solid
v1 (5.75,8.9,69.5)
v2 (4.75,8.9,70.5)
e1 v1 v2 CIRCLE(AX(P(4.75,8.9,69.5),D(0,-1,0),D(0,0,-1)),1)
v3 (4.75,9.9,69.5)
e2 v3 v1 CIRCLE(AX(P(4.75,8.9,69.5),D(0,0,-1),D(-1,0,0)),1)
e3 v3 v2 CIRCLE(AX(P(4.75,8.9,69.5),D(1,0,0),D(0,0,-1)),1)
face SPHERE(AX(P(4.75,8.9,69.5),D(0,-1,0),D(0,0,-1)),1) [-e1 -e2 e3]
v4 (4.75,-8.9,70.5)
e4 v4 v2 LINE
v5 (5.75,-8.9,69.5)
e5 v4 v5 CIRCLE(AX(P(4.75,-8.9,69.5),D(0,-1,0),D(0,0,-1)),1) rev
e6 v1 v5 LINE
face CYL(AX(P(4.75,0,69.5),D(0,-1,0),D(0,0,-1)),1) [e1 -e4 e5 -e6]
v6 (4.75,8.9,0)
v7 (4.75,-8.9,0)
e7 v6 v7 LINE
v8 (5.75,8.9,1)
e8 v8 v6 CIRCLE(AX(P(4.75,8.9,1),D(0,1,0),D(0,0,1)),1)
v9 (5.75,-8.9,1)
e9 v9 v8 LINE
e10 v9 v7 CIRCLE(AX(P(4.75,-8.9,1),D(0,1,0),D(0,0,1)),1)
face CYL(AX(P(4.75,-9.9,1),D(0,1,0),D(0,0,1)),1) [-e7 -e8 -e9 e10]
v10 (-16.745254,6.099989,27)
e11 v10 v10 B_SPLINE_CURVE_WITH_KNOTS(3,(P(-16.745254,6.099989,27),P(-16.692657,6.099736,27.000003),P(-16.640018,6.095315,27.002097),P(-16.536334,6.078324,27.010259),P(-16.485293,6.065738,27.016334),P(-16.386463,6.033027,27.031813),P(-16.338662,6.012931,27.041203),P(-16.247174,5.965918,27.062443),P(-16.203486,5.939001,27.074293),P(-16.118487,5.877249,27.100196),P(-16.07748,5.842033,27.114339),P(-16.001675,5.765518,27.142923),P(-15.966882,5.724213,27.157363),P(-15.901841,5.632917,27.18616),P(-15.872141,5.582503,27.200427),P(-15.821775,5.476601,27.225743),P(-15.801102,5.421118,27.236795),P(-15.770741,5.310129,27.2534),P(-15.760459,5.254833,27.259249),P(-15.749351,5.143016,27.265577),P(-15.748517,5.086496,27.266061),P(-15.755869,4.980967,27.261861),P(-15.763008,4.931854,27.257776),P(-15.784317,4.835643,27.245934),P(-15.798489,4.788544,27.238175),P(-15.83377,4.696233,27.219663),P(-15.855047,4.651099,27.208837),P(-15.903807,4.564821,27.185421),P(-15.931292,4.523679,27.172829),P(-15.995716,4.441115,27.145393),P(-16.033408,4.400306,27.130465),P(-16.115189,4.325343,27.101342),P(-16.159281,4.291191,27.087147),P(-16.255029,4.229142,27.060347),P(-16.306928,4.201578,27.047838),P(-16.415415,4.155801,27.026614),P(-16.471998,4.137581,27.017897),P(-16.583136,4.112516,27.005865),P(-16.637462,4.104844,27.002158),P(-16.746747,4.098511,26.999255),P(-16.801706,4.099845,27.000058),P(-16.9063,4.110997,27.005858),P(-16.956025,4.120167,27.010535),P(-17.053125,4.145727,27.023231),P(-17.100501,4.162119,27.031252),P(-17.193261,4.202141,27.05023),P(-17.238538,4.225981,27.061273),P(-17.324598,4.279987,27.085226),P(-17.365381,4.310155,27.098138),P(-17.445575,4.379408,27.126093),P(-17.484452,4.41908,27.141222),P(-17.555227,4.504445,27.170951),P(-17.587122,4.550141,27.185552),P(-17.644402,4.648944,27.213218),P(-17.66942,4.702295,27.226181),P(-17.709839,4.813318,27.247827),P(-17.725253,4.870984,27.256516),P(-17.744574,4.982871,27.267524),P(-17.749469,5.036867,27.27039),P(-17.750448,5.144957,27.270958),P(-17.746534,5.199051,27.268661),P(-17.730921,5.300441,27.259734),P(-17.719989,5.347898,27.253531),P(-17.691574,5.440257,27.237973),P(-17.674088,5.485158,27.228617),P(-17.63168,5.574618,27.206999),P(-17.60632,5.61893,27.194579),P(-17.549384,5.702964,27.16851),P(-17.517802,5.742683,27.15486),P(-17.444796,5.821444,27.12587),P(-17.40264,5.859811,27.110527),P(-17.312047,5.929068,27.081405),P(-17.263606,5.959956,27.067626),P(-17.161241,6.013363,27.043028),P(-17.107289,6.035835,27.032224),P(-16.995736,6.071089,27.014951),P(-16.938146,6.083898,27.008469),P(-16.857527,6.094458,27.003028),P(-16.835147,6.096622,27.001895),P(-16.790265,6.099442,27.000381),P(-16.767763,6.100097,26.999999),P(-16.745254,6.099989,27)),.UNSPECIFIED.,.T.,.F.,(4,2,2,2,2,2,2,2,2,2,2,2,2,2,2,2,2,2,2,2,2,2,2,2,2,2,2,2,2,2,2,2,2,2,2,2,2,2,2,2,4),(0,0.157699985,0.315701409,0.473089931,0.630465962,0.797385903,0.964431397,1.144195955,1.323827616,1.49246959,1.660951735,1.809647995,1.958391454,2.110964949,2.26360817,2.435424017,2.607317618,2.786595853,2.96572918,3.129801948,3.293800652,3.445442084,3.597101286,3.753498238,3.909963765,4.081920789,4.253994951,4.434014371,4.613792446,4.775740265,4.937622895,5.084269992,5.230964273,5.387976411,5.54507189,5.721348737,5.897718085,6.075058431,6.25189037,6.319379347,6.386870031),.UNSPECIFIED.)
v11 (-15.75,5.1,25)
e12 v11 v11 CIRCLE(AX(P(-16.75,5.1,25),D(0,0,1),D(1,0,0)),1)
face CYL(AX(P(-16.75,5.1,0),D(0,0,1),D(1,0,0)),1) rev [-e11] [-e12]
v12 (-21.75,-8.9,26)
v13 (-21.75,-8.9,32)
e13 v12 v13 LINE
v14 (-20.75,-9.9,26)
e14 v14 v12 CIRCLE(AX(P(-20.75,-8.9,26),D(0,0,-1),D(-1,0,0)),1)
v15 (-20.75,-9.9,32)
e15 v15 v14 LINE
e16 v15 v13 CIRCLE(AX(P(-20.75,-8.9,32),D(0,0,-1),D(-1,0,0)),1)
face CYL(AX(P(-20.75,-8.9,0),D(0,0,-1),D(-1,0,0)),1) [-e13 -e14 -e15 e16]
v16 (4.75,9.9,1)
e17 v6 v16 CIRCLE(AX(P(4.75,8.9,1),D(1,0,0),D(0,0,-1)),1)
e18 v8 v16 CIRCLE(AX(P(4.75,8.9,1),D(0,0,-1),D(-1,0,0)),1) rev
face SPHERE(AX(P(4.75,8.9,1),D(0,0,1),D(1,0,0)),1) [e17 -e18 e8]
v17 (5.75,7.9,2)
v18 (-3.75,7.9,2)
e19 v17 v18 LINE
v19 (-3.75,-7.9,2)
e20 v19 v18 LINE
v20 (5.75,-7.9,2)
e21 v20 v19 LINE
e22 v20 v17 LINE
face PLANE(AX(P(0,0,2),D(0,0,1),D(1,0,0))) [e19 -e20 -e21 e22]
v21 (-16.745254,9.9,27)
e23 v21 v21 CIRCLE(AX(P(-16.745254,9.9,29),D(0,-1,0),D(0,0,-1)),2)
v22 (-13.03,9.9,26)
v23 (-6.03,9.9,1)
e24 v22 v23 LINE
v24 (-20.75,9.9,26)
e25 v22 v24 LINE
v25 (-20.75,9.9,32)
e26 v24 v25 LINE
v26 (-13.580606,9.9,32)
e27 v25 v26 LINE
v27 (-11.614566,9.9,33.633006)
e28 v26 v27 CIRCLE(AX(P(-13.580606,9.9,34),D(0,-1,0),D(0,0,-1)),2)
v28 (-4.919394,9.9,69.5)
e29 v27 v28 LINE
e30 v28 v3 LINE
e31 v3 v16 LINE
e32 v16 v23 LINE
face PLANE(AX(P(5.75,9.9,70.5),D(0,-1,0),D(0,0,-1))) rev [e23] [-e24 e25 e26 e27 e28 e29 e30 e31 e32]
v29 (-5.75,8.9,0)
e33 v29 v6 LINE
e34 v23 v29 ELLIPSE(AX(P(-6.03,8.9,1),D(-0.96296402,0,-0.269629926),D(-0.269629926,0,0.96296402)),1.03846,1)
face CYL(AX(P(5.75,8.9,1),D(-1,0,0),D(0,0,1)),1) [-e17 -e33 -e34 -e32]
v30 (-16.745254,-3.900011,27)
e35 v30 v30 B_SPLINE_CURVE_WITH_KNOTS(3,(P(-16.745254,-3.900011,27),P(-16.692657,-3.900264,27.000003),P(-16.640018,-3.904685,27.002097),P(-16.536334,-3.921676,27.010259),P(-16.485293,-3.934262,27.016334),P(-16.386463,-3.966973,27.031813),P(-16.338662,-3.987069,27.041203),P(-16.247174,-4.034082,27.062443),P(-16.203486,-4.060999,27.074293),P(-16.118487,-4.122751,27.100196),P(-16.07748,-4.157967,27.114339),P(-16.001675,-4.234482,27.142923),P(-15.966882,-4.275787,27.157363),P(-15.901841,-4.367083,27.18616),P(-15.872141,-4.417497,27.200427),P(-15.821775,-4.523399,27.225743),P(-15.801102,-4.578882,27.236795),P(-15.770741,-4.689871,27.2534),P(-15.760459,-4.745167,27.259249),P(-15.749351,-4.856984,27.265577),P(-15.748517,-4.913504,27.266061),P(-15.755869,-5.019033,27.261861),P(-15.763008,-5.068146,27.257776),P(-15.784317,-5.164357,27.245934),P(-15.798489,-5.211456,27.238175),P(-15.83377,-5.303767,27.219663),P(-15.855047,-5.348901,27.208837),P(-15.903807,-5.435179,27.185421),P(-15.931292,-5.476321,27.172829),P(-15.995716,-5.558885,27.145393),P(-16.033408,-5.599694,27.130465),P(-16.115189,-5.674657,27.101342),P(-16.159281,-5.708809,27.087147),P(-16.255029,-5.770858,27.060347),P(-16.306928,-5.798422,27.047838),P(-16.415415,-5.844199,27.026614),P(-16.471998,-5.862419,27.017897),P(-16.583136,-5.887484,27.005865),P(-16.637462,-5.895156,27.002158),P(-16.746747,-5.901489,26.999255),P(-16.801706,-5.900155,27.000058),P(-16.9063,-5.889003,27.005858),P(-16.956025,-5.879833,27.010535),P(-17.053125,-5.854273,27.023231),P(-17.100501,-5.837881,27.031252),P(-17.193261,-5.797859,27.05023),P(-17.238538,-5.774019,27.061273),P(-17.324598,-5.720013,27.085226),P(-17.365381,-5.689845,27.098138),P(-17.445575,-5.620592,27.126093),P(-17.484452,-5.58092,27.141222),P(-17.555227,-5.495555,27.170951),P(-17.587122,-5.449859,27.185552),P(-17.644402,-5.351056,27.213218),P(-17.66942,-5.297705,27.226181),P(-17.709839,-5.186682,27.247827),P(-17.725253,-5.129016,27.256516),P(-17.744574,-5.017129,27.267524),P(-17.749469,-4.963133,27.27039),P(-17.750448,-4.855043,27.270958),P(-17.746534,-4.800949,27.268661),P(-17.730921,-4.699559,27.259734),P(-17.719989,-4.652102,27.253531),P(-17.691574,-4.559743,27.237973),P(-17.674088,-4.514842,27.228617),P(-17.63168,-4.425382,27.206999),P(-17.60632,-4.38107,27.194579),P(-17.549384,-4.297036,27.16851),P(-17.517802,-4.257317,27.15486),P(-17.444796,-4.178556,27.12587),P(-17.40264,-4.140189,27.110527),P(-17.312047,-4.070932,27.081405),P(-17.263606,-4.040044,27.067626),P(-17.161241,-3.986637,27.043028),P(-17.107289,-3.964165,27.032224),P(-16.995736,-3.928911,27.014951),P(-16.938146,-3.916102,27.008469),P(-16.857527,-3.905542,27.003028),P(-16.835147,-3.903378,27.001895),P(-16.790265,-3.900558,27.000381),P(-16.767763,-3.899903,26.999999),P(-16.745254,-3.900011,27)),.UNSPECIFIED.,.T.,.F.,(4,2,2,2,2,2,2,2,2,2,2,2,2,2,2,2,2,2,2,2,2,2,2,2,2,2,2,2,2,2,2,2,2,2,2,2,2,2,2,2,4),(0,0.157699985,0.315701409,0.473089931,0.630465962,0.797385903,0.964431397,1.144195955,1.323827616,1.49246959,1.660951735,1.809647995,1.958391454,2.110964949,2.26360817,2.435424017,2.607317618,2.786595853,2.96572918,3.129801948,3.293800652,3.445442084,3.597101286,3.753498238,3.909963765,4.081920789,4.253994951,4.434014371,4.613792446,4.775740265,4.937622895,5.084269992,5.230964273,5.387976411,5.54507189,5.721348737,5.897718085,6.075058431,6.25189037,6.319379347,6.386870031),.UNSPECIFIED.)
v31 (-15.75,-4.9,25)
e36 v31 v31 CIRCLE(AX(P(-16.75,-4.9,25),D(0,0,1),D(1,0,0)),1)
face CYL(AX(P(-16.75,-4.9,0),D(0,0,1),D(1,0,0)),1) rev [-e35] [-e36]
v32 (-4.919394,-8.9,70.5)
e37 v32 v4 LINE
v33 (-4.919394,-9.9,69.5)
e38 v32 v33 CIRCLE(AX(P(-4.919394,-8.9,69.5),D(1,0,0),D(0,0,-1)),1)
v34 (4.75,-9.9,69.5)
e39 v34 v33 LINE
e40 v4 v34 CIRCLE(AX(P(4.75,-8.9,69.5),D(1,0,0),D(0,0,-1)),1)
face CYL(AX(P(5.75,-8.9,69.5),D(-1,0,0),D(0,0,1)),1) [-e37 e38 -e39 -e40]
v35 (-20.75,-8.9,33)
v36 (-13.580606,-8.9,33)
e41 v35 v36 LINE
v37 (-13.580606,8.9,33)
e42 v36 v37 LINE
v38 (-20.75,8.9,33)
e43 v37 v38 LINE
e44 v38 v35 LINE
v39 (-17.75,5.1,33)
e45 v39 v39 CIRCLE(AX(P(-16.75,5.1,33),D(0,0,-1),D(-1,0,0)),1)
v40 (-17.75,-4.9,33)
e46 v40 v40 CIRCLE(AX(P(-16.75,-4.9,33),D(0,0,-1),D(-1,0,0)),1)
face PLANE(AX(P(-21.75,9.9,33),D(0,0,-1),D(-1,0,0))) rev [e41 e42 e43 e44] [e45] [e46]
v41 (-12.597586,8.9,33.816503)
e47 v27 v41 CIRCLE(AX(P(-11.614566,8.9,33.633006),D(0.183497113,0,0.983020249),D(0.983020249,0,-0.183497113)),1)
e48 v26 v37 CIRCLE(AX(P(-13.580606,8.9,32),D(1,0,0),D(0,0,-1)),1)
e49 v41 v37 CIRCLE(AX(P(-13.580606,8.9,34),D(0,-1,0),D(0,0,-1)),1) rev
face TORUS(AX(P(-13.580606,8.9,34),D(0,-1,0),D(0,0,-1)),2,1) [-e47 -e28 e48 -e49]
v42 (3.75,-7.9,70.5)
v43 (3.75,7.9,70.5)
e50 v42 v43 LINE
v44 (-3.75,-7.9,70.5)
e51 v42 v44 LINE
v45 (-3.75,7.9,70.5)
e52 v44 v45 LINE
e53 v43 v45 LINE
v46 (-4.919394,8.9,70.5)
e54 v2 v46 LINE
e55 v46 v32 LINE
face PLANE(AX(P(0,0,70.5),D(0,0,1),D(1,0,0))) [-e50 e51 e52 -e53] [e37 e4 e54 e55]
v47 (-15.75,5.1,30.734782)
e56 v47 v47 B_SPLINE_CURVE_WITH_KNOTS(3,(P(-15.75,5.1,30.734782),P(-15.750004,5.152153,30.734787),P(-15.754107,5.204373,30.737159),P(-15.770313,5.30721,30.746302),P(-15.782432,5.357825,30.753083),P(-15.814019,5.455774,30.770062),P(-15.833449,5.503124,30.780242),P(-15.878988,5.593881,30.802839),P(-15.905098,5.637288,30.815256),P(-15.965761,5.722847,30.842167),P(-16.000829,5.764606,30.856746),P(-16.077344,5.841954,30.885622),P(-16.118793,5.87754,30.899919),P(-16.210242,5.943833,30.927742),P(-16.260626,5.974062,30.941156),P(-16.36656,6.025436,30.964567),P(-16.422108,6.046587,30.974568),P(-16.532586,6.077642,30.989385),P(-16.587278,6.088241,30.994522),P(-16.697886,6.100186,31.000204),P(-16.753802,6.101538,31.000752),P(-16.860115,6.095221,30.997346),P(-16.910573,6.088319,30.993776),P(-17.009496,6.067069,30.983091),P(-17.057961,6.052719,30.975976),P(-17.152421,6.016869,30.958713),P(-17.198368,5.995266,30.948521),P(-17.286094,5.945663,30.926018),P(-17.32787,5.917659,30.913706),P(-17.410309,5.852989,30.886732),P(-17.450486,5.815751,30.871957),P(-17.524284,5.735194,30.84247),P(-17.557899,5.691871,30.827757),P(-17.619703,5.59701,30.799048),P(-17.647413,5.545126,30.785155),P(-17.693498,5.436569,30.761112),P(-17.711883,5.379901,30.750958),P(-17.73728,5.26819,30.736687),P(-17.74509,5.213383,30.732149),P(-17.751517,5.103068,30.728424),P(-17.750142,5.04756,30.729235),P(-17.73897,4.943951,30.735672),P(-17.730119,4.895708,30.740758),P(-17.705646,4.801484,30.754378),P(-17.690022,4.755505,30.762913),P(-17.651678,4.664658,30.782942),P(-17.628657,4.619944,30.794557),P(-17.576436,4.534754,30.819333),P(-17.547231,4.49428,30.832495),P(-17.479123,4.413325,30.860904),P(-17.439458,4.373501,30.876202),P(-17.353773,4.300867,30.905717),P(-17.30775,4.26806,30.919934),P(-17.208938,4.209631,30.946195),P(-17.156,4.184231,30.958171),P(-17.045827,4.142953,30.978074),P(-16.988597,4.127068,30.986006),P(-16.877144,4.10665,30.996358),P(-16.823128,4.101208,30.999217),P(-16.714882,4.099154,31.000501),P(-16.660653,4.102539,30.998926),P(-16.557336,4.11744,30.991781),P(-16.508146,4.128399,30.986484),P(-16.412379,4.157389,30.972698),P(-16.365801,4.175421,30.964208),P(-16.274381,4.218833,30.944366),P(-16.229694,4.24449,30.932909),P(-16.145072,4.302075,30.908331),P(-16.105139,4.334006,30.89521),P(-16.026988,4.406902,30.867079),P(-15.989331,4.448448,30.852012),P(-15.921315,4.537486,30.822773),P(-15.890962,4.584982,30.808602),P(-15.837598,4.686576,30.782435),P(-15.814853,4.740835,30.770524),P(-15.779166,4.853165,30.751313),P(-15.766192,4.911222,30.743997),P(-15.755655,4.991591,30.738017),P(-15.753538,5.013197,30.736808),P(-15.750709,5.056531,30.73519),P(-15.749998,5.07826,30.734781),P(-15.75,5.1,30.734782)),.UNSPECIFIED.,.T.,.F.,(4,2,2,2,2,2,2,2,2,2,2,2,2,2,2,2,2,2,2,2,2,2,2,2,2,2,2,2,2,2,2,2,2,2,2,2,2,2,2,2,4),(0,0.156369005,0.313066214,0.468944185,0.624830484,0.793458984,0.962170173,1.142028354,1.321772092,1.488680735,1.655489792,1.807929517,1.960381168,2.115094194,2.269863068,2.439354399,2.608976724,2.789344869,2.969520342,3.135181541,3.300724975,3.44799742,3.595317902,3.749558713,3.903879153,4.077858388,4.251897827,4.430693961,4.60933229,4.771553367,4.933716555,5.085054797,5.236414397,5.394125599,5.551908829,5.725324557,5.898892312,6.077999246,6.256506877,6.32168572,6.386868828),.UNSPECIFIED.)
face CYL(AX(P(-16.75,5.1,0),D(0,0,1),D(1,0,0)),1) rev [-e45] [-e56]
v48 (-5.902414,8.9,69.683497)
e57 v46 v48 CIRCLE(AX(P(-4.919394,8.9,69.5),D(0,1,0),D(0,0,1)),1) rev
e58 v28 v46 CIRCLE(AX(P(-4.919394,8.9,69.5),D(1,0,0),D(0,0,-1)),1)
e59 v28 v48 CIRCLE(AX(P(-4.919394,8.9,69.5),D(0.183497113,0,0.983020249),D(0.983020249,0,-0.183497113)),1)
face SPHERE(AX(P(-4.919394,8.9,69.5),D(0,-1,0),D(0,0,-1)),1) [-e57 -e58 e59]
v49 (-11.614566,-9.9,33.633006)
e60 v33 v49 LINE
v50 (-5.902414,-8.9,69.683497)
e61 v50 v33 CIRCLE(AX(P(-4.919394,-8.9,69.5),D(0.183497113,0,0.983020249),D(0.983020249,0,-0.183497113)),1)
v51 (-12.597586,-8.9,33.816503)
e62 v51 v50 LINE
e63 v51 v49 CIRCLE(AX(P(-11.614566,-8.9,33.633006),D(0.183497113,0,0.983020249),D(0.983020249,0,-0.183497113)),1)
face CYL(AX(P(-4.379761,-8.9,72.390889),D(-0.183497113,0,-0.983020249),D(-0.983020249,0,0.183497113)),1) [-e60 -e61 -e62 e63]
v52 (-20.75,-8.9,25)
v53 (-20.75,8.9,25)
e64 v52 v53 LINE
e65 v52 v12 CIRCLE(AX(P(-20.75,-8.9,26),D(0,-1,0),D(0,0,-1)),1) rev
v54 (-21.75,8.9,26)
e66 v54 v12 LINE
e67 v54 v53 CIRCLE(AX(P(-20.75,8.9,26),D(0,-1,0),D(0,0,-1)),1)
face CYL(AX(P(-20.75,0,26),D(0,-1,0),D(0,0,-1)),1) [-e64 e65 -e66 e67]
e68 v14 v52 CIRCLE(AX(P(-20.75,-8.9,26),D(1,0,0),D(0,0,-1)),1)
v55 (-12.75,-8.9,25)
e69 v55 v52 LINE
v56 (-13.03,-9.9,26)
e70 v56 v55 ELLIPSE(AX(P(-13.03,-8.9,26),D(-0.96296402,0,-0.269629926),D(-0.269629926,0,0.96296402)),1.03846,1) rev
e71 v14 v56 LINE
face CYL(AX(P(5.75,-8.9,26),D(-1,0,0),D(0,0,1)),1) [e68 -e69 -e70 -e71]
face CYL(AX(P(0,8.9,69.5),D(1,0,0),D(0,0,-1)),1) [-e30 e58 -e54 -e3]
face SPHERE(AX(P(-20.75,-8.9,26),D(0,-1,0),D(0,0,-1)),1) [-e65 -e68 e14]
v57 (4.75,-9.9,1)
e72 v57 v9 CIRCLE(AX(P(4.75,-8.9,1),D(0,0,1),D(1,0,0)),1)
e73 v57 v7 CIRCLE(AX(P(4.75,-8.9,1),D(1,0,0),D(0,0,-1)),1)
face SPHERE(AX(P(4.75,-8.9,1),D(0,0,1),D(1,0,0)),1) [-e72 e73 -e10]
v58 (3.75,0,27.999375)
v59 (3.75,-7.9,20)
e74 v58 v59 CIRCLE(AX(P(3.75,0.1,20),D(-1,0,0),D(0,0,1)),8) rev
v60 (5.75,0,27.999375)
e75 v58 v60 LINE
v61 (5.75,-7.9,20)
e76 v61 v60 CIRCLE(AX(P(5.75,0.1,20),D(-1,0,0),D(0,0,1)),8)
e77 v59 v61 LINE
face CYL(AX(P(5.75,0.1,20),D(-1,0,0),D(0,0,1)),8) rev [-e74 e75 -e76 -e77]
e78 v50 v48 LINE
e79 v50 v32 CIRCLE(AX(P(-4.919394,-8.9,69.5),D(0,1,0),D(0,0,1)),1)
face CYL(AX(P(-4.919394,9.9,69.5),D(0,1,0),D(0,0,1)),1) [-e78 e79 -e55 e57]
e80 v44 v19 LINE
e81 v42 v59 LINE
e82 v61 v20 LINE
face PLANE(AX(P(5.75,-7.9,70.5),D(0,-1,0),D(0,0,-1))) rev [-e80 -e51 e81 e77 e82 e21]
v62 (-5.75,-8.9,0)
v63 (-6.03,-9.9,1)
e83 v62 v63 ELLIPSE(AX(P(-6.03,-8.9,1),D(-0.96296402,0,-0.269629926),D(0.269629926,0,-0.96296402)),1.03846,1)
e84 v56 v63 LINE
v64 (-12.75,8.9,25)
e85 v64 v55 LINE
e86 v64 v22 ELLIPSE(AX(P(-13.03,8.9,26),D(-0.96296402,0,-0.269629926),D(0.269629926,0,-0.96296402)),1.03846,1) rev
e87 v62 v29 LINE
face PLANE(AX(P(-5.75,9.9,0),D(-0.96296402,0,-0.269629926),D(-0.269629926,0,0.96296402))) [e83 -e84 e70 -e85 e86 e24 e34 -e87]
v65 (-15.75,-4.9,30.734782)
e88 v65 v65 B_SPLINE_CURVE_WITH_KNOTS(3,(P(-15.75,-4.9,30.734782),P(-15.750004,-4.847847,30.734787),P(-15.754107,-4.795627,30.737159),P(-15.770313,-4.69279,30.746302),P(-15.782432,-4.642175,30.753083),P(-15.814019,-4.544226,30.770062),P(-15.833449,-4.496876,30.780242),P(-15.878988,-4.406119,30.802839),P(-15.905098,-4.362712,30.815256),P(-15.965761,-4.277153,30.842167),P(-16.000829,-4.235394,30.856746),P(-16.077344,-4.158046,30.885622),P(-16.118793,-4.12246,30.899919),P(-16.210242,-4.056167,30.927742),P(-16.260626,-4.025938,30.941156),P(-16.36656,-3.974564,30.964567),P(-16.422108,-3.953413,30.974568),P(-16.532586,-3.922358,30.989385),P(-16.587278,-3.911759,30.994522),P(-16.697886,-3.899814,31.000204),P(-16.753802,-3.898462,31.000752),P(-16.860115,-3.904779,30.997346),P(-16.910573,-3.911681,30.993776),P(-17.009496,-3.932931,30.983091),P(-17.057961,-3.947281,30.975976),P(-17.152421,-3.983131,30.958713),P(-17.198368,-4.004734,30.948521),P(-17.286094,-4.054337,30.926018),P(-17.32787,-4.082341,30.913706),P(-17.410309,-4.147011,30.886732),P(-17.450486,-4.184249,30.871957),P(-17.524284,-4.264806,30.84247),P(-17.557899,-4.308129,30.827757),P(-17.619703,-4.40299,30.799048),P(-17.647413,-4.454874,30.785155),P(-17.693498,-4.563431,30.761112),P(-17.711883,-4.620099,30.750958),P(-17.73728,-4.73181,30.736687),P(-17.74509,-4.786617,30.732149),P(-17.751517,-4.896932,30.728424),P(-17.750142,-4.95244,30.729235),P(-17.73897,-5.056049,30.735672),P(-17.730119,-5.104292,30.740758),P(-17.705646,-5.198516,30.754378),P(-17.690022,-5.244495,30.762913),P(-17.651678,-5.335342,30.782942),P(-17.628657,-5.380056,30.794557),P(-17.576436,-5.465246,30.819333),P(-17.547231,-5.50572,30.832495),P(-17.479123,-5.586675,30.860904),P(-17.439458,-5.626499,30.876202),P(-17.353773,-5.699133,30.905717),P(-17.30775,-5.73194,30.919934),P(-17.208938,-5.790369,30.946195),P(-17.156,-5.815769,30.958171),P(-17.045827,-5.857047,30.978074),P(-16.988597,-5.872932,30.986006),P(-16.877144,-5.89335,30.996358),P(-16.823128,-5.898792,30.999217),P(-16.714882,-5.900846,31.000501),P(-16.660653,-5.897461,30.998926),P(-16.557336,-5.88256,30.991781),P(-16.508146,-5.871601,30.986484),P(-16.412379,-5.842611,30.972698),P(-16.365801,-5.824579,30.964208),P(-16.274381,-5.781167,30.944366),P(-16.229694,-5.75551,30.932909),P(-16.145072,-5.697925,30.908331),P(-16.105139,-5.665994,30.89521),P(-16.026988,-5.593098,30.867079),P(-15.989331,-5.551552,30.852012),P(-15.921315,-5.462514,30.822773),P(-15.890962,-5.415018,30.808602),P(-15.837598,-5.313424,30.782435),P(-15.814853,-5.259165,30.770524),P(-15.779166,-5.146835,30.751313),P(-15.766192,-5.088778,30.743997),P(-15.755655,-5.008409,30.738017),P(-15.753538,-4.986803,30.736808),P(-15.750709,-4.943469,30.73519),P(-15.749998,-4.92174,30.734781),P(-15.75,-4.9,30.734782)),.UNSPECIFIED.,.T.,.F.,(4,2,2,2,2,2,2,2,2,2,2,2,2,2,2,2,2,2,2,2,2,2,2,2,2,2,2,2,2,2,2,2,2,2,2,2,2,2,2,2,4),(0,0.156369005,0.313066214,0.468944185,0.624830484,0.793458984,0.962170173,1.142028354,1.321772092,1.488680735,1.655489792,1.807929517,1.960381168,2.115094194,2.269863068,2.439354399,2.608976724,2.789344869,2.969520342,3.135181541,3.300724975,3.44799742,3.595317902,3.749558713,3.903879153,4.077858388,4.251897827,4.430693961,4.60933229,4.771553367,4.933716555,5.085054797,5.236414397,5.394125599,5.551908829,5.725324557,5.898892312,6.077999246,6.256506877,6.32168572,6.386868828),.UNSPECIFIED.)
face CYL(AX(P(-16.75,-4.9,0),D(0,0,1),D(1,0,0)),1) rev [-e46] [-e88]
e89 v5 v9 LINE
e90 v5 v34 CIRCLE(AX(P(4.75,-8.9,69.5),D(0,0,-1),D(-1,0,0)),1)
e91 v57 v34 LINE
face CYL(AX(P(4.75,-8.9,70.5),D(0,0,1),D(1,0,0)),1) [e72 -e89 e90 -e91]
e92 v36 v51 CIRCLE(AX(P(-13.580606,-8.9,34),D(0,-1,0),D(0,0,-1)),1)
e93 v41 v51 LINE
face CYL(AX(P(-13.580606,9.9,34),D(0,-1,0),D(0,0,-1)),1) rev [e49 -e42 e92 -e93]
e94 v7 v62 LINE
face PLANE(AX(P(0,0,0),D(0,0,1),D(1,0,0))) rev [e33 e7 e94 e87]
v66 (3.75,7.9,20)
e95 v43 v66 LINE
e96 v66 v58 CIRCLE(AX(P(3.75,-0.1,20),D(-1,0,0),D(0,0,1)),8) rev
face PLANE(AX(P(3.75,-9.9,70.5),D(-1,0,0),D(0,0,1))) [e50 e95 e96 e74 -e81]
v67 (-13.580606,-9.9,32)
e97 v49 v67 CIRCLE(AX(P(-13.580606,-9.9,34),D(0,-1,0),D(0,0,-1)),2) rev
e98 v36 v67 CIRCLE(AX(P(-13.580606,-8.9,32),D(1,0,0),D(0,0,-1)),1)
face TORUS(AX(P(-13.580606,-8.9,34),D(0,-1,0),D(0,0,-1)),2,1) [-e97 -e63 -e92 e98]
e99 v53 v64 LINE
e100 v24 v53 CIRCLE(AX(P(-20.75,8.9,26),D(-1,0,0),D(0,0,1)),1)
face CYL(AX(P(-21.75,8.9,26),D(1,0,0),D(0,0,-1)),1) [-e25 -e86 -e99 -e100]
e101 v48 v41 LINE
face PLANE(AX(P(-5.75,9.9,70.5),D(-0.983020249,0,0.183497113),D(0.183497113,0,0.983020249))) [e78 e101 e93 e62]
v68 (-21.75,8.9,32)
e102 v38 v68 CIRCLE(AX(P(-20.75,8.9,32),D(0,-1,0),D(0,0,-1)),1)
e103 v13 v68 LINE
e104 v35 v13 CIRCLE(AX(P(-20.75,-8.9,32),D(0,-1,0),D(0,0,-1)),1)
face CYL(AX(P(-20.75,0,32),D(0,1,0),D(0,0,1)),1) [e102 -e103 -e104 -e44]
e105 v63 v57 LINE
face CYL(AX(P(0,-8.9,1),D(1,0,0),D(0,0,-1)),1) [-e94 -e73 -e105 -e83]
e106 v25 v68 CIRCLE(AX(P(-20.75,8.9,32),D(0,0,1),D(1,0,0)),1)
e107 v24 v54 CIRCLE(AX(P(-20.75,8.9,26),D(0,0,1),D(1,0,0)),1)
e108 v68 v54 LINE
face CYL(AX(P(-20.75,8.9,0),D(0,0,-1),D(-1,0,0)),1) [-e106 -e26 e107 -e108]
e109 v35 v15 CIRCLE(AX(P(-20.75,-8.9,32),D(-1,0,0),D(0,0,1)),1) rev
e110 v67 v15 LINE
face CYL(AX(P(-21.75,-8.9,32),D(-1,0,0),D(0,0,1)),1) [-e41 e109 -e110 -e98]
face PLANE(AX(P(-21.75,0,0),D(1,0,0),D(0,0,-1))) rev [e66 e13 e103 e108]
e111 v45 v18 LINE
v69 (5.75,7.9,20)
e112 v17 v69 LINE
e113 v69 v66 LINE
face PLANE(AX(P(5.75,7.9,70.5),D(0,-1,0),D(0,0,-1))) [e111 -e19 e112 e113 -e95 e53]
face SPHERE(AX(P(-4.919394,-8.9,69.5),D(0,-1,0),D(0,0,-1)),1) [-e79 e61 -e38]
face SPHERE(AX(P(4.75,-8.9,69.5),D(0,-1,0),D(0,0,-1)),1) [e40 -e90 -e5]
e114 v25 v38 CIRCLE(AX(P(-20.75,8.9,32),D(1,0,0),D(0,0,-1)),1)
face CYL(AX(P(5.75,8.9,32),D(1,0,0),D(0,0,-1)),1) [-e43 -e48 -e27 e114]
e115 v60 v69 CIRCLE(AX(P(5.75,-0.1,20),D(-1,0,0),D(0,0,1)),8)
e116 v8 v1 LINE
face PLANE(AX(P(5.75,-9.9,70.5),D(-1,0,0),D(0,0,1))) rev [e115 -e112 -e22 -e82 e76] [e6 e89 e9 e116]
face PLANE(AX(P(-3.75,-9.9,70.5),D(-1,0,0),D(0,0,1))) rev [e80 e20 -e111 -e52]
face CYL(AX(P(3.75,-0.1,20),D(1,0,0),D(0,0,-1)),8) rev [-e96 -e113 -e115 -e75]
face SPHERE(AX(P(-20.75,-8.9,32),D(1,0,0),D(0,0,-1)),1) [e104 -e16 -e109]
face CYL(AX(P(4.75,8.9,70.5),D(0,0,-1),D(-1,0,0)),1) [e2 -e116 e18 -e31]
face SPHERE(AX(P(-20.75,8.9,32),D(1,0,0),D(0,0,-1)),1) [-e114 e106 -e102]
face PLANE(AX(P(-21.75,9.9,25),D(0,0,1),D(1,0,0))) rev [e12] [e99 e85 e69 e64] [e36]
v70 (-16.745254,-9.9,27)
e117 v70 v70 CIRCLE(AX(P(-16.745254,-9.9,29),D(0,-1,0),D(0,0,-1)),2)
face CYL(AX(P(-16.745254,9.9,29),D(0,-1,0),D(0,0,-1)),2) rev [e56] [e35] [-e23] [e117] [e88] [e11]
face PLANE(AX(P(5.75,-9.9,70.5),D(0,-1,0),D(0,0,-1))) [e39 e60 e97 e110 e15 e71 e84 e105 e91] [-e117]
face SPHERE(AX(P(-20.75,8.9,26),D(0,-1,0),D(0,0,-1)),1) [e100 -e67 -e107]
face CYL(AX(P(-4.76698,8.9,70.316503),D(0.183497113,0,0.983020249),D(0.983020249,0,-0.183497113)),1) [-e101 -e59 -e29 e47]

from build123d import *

# Parameters (mm, degrees)
CROQUIS1_W                 = 19.8
CROQUIS1_H                 = 11.5
SALIENTE_EXTRUIR1_DEPTH    = 70.5
VACIADO1_T                 = -2
CROQUIS5_W                 = 15.8
CROQUIS5_H                 = 2
SALIENTE_EXTRUIR2_DEPTH    = 2
CROQUIS6_W                 = 19.8
CROQUIS6_H                 = 8
SALIENTE_EXTRUIR4_DEPTH    = 16
SALIENTE_EXTRUIR5_DEPTH    = 19.8
CROQUIS10_R                = 2
CORTAR_EXTRUIR4_DEPTH      = 19.8
CORTAR_EXTRUIR3_DEPTH      = 43.653516854
CORTAR_EXTRUIR3_DEPTH_BACK = 43.653516854
CROQUIS8_R                 = 1
CROQUIS11_W                = 15.8
CROQUIS11_H                = 26
CORTAR_EXTRUIR5_DEPTH      = 2
REDONDEO2_R                = 8
REDONDEO4_R                = 1
REDONDEO5_R                = 1
REDONDEO6_R                = 1
REDONDEO7_R                = 1
REDONDEO8_R                = 1


with BuildPart() as part:
    # Croquis1 → Saliente-Extruir1 (new body)
    with BuildSketch(Plane(origin=(0, 0, 0), x_dir=(0, 1, 0), z_dir=(0, 0, 1))):
        Rectangle(CROQUIS1_W, CROQUIS1_H)
    extrude(amount=SALIENTE_EXTRUIR1_DEPTH)

    # Vaciado1
    vaciado1_openings = [part.faces().sort_by_distance(p)[0] for p in [
        (0, 0, 70.5),
    ]]
    offset(amount=VACIADO1_T, openings=vaciado1_openings, kind=Kind.INTERSECTION)

    # Croquis5 → Saliente-Extruir2 (add)
    with BuildSketch(Plane.YZ.offset(5.75)):
        with Locations((0, 69.5)):
            Rectangle(CROQUIS5_W, CROQUIS5_H)
    extrude(amount=-SALIENTE_EXTRUIR2_DEPTH)

    # Croquis6 → Saliente-Extruir4 (add)
    with BuildSketch(Plane(origin=(-5.75, 0, 0), x_dir=(0, -1, 0), z_dir=(-1, 0, 0))):
        with Locations((0, 29)):
            Rectangle(CROQUIS6_W, CROQUIS6_H)
    extrude(amount=SALIENTE_EXTRUIR4_DEPTH)

    # Croquis9 → Saliente-Extruir5 (add)
    with BuildSketch(Plane.XZ.offset(9.9)):
        Polygon((-5.75, 70.5), (-12.75, 33), (-5.75, 33), align=None)
        Polygon((-5.75, 0), (-12.75, 25), (-5.75, 25), align=None)
    extrude(amount=-SALIENTE_EXTRUIR5_DEPTH)

    # Croquis10 → Cortar-Extruir4 (cut)
    with BuildSketch(Plane.XZ.offset(9.9)):
        with Locations(Location((-16.745253682, 29, 0), (0, 0, 270))):
            Circle(CROQUIS10_R)
    extrude(amount=-CORTAR_EXTRUIR4_DEPTH, mode=Mode.SUBTRACT)

    # Croquis8 → Cortar-Extruir3 (cut, two sides: drawn at the far end of the back side and taken through both)
    with BuildSketch(Plane(origin=(-4, 0, 33), x_dir=(1, 0, 0), z_dir=(0, 0, 1)).offset(-CORTAR_EXTRUIR3_DEPTH_BACK)):
        with Locations((-12.75, 5.1)):
            Circle(CROQUIS8_R)
        with Locations((-12.75, -4.9)):
            Circle(CROQUIS8_R)
    extrude(amount=CORTAR_EXTRUIR3_DEPTH + CORTAR_EXTRUIR3_DEPTH_BACK, mode=Mode.SUBTRACT)

    # Croquis11 → Cortar-Extruir5 (cut)
    with BuildSketch(Plane.YZ.offset(5.75)):
        with Locations((0, 15)):
            Rectangle(CROQUIS11_W, CROQUIS11_H)
    extrude(amount=-CORTAR_EXTRUIR5_DEPTH, mode=Mode.SUBTRACT)

    # Redondeo2
    # the kernel refuses this fillet: 8 mm, written as the material it adds along each edge
    with BuildSketch(Plane(origin=(5.75, -7.9, 28), x_dir=(0, 1, 0), z_dir=(-1, 0, 0)), Plane(origin=(5.75, 7.9, 28), x_dir=(0, 0, -1), z_dir=(-1, 0, 0))) as redondeo2_piece_1:
        with BuildLine():
            CenterArc((REDONDEO2_R, REDONDEO2_R), REDONDEO2_R, 180, 90)
            Line((0, REDONDEO2_R), (0, 0))
            Line((0, 0), (REDONDEO2_R, 0))
        make_face()
    extrude(amount=2)

    # Redondeo4
    redondeo4_edges = [part.edges().sort_by_distance(p)[0] for p in [
        (-12.75, 0, 33),
    ]]
    fillet(redondeo4_edges, radius=REDONDEO4_R)

    # Redondeo5
    redondeo5_edges = [part.edges().sort_by_distance(p)[0] for p in [
        (5.75, 0, 70.5),
        (-5.75, 0, 70.5),
    ]]
    fillet(redondeo5_edges, radius=REDONDEO5_R)

    # Redondeo6
    redondeo6_edges = [part.edges().sort_by_distance(p)[0] for p in [
        (-12.941660805, -9.9, 33.230748054),
        (-12.941660805, 9.9, 33.230748054),
        (-9.25, 9.9, 51.75),
        (-9.25, -9.9, 51.75),
        (-0.084696812, 9.9, 70.5),
        (5.75, 9.9, 34.75),
        (5.457106781, 9.9, 70.207106781),
        (-5.558339195, 9.9, 70.269251946),
        (-0.084696812, -9.9, 70.5),
        (5.75, -9.9, 34.75),
        (5.457106781, -9.9, 70.207106781),
        (-5.558339195, -9.9, 70.269251946),
        (-17.665303188, 9.9, 33),
        (-17.665303188, -9.9, 33),
    ]]
    fillet(redondeo6_edges, radius=REDONDEO6_R)

    # Redondeo7
    redondeo7_edges = [part.edges().sort_by_distance(p)[0] for p in [
        (-0.5, 9.9, 0),
        (5.75, 0, 0),
        (-0.5, -9.9, 0),
        (5.457106781, -9.607106781, 0),
        (5.457106781, 9.607106781, 0),
        (-21.75, 0, 25),
    ]]
    fillet(redondeo7_edges, radius=REDONDEO7_R)

    # Redondeo8
    redondeo8_edges = [part.edges().sort_by_distance(p)[0] for p in [
        (-21.75, 9.9, 29),
        (-21.75, 0, 33),
        (-21.75, -9.607106781, 32.707106781),
        (-21.75, 9.607106781, 32.707106781),
        (-21.75, -9.9, 29),
        (-16.75, -9.9, 25),
        (-21.457106781, -9.9, 25.292893219),
        (-16.75, 9.9, 25),
        (-21.457106781, 9.9, 25.292893219),
    ]]
    fillet(redondeo8_edges, radius=REDONDEO8_R)


solid = part.part
